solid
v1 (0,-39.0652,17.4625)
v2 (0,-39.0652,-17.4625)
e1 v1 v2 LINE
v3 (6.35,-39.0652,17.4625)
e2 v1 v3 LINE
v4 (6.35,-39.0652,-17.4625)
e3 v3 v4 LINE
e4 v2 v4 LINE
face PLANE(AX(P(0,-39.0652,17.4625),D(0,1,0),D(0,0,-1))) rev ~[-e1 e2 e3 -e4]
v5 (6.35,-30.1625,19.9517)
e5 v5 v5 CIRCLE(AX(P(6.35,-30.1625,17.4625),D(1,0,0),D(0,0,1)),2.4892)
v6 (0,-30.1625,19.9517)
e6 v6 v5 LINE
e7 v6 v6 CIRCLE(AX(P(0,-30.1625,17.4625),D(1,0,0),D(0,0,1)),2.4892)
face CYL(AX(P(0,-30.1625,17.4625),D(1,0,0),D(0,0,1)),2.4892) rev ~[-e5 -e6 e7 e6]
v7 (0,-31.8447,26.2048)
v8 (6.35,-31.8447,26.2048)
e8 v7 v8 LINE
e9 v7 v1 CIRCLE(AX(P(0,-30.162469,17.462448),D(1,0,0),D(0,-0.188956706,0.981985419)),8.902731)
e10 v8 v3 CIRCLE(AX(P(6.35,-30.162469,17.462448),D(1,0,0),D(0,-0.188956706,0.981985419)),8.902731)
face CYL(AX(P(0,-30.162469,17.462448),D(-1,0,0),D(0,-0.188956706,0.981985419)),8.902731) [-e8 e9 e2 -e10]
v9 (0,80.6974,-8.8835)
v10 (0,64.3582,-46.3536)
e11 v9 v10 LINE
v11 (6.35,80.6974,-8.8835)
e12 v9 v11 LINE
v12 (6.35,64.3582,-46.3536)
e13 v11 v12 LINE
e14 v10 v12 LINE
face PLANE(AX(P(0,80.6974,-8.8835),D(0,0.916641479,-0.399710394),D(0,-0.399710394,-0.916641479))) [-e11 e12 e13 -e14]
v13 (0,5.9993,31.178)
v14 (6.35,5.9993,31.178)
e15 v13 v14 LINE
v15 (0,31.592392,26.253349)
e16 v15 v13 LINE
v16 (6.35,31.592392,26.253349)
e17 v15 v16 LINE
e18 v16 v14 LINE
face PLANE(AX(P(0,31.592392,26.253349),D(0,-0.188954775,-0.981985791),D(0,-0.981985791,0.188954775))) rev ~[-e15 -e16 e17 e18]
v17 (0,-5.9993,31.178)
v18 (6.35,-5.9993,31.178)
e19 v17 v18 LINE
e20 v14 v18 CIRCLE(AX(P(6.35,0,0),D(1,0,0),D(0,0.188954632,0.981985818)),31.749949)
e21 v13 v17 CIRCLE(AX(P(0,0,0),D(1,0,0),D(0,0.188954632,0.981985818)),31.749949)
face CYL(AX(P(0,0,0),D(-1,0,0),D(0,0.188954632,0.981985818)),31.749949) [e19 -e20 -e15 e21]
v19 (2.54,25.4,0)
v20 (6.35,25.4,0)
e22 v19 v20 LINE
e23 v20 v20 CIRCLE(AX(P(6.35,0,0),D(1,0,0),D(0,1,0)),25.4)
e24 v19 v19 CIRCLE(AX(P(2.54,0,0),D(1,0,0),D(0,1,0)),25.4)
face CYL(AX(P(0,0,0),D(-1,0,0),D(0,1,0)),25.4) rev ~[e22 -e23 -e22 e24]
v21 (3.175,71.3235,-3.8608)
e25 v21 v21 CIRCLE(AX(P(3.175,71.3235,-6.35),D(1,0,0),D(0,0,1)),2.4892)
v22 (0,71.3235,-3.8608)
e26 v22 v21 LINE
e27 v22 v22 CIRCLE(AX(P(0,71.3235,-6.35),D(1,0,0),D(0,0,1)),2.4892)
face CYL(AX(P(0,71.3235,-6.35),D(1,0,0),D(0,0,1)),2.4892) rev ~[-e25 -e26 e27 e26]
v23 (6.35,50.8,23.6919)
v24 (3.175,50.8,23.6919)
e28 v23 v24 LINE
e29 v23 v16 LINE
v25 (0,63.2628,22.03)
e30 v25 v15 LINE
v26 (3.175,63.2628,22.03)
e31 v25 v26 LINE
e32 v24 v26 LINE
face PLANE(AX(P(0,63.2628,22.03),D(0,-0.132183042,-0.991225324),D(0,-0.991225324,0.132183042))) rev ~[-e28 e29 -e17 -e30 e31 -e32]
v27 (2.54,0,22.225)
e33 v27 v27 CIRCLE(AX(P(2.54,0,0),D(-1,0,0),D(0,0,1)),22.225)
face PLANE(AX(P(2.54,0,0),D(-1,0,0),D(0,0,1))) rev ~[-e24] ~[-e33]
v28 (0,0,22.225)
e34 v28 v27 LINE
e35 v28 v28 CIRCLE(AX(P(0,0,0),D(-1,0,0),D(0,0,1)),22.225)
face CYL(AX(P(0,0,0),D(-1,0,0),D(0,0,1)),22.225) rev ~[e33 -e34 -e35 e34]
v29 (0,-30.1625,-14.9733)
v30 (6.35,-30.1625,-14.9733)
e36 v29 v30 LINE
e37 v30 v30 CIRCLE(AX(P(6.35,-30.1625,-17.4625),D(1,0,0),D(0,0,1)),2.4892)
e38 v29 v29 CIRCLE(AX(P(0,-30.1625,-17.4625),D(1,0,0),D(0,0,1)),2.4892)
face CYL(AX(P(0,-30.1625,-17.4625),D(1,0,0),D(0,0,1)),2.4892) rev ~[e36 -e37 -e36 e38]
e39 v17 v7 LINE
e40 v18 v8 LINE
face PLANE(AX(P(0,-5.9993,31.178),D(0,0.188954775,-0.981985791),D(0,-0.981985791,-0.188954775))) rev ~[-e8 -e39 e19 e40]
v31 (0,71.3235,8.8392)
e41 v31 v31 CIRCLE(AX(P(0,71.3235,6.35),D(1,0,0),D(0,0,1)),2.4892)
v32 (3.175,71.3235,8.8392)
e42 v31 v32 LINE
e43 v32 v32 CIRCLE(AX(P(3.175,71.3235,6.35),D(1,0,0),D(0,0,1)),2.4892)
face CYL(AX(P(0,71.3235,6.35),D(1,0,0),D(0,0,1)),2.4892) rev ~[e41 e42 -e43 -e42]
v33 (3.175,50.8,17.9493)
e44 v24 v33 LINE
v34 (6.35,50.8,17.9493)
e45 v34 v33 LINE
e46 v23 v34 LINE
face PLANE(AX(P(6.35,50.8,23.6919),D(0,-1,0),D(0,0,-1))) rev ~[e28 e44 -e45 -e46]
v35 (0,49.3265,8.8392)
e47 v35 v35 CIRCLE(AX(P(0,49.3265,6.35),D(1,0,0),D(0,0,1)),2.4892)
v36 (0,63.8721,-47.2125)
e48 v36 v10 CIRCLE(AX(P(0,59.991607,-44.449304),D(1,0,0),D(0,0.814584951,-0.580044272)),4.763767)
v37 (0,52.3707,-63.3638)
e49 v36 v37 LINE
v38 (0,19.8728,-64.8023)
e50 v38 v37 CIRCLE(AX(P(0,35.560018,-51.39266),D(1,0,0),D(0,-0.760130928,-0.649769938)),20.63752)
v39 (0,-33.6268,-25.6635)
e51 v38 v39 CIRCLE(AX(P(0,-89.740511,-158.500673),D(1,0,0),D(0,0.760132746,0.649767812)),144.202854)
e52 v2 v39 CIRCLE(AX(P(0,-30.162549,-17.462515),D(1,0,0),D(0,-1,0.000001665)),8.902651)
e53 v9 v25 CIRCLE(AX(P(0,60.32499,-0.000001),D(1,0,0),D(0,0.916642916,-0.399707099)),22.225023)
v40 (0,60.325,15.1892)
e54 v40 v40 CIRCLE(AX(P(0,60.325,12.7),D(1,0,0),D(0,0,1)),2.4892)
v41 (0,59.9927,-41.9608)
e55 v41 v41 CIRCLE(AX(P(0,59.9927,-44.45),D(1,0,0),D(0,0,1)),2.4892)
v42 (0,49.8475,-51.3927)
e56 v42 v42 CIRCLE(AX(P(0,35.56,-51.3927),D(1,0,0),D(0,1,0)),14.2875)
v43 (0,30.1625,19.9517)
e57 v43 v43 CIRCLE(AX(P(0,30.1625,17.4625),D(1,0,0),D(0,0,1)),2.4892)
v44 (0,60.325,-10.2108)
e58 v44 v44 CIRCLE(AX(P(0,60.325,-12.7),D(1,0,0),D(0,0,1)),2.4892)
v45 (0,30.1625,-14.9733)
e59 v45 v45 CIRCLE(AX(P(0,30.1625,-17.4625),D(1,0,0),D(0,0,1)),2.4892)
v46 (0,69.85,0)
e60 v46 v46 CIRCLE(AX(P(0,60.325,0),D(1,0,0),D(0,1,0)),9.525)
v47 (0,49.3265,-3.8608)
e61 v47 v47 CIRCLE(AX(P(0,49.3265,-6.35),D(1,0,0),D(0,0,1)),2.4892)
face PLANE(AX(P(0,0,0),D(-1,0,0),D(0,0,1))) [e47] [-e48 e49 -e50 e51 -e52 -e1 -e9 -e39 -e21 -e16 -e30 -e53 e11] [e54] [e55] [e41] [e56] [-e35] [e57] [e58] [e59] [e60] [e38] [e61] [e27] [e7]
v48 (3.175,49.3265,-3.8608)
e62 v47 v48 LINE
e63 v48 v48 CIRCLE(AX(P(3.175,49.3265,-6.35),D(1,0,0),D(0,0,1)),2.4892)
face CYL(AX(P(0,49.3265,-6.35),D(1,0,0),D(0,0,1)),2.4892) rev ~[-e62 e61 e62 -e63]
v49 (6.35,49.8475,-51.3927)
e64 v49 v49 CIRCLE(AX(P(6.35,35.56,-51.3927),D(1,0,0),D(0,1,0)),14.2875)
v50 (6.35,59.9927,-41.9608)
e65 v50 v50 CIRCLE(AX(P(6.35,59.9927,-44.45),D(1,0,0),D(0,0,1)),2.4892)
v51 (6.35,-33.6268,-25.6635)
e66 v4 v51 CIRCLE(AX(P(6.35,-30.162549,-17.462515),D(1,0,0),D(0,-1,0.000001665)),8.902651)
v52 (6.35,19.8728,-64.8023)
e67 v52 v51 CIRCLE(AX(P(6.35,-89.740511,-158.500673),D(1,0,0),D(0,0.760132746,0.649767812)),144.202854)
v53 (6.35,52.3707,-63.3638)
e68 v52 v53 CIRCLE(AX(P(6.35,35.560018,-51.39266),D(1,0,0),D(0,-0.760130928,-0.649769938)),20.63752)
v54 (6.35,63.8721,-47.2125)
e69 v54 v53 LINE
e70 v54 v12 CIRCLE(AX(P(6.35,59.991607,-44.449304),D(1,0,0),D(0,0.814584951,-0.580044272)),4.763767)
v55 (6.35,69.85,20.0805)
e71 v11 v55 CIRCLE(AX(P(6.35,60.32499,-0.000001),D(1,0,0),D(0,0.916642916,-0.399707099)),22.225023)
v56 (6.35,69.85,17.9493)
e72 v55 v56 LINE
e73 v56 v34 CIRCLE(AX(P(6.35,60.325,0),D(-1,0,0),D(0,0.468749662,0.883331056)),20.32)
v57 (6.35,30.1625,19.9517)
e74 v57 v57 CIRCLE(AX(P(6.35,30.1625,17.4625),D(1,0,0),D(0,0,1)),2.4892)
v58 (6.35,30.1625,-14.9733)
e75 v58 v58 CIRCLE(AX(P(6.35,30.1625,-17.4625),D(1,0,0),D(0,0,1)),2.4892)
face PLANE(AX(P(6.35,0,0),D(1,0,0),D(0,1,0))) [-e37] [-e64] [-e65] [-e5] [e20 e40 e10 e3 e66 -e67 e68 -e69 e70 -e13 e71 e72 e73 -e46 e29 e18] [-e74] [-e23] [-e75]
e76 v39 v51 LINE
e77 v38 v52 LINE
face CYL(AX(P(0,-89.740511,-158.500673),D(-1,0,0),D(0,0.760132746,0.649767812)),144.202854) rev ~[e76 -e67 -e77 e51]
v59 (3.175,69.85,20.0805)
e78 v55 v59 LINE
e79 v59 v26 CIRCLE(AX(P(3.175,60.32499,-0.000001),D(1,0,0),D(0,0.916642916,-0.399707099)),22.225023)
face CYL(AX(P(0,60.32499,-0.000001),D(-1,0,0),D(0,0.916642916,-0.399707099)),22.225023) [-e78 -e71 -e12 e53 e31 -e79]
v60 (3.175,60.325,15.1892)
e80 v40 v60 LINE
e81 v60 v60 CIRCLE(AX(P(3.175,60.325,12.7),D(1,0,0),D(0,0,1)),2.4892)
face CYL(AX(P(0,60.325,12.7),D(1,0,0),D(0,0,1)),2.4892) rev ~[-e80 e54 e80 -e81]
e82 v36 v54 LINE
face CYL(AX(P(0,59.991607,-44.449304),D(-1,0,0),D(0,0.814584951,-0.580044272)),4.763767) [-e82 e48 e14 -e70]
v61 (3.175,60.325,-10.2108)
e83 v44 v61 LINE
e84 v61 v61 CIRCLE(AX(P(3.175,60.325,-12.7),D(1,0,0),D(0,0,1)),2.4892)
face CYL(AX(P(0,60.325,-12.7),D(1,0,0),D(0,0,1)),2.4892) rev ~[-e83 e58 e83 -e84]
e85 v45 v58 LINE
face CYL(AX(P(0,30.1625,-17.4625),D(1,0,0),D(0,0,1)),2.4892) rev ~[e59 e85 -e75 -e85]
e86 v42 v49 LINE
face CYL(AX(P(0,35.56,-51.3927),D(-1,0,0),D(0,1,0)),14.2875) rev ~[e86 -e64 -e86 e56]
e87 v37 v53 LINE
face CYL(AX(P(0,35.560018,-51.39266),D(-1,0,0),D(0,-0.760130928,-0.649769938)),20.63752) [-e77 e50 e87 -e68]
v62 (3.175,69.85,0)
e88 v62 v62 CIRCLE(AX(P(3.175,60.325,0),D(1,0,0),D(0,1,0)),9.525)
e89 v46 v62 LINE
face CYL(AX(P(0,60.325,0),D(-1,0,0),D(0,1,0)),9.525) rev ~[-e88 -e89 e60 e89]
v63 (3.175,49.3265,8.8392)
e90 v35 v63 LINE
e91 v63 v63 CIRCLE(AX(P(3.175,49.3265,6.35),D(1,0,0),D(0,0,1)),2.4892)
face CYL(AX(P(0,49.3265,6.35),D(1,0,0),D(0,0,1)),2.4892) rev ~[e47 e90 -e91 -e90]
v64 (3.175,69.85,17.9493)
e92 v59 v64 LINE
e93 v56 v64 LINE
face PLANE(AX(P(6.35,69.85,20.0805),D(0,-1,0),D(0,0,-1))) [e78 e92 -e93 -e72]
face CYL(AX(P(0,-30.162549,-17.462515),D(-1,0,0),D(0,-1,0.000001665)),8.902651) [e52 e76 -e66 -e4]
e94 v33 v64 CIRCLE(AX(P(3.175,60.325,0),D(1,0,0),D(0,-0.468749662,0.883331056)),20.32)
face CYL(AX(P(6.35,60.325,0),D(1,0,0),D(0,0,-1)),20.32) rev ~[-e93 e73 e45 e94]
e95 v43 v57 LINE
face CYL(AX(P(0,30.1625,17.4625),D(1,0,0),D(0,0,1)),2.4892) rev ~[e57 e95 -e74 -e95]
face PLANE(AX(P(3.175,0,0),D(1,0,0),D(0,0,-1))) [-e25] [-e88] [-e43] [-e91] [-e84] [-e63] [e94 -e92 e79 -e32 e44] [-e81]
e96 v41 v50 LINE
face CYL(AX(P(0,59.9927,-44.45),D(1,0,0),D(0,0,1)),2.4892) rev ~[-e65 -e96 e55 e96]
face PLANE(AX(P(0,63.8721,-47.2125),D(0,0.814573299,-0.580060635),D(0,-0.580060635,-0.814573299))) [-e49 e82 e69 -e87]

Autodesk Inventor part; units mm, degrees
ref_plane "YZ Plane" through (0, 0, 0) normal (1, 0, 0) x (0, 1, 0)
ref_plane "XZ Plane" through (0, 0, 0) normal (0, 1, 0) x (-1, 0, 0)
ref_plane "XY Plane" through (0, 0, 0) normal (0, 0, 1) x (1, 0, 0)
sketch "Sketch1" plane through (0, 0, 0) normal (1, 0, 0) x (0, 1, 0)
  circle A0 centre (0, 0) radius 38.1 construction
  line L0 (27.94, -25.903) -> (27.94, -76.2) construction
  line L1 (27.94, -76.2) -> (-27.94, -76.2) construction
  line L2 (-27.94, -76.2) -> (-27.94, -25.903) construction
  line L3 (-30.1625, -17.4625) -> (30.1625, -17.4625) construction
  line L4 (30.1625, -17.4625) -> (30.1625, 17.4625) construction
  line L5 (30.1625, 17.4625) -> (-30.1625, 17.4625) construction
  line L6 (-30.1625, 17.4625) -> (-30.1625, -17.4625) construction
  line L7 (-30.1625, -17.4625) -> (30.1625, 17.4625) construction
  line L8 (30.1625, -17.4625) -> (-30.1625, 17.4625) construction
  circle A1 centre (30.1625, 17.4625) radius 2.5527 construction
  circle A2 centre (30.1625, -17.4625) radius 2.5527 construction
  circle A3 centre (-30.1625, -17.4625) radius 2.5527 construction
  circle A4 centre (-30.1625, 17.4625) radius 2.5527 construction
  point P0 (0, -76.2)
  dimension "d0" = 76.2
  dimension "d1" = 55.88
  dimension "d2" = 76.2
  dimension "d3" = 60.325
  dimension "d4" = 34.925
  dimension "d5" = 5.1054
  dimension "d6" = 5.1054
  dimension "d7" = 5.1054
  dimension "d8" = 5.1054
sketch "Sketch2" plane through (0, 0, 0) normal (1, 0, 0) x (0, 1, 0)
  line L0 (-30.1625, -17.4625) -> (30.1625, -17.4625) construction
  circle A0 centre (30.1625, -17.4625) radius 2.5527 construction
  circle A1 centre (-30.1625, -17.4625) radius 2.5527 construction
  line L1 (-30.1625, 17.4625) -> (-30.1625, -17.4625) construction
  circle A2 centre (-30.1625, 17.4625) radius 2.5527 construction
  line L2 (30.1625, -17.4625) -> (30.1625, 17.4625) construction
  line L3 (30.1625, -17.4625) -> (-30.1625, 17.4625) construction
  line L4 (30.1625, 17.4625) -> (-30.1625, 17.4625) construction
  line L5 (-30.1625, -17.4625) -> (30.1625, 17.4625) construction
  circle A3 centre (30.1625, 17.4625) radius 2.5527 construction
  circle A4 centre (0, 0) radius 38.1 construction
  line L6 (27.94, -25.903) -> (27.94, -76.2) construction
  line L7 (27.94, -76.2) -> (-27.94, -76.2) construction
  line L8 (-27.94, -76.2) -> (-27.94, -25.903) construction
  circle A5 centre (60.325, 0) radius 12.7 construction
  circle A6 centre (35.56, -51.3927) radius 14.2875
  circle A7 centre (35.56, -51.3927) radius 25.4 construction
  circle A8 centre (60.325, 0) radius 9.525
  circle A9 centre (60.325, 0) radius 22.225 construction
  circle A10 centre (30.1625, 17.4625) radius 8.9027 construction
  circle A11 centre (30.1625, -17.4625) radius 8.9027 construction
  circle A12 centre (-30.1625, -17.4625) radius 8.9027 construction
  circle A13 centre (-30.1625, 17.4625) radius 8.9027 construction
  line L9 (63.2628, 22.03) -> (31.3393, 26.2871)
  line L10 (-39.0652, 17.4625) -> (-39.0652, -17.4625)
  arc A14 (80.6974, -8.8835) -> (63.2628, 22.03) centre (60.325, 0) ccw
  arc A15 (31.3393, 26.2871) -> (31.8447, 26.2048) centre (30.1625, 17.4625) ccw
  arc A16 (-31.8447, 26.2048) -> (-39.0652, 17.4625) centre (-30.1625, 17.4625) ccw
  arc A17 (-39.0652, -17.4625) -> (-33.6268, -25.6635) centre (-30.1625, -17.4625) ccw
  circle A18 centre (35.56, -51.3927) radius 25.4 construction
  circle A19 centre (17.331, -33.7048) radius 4.7625 construction
  circle A20 centre (32.8295, -73.6177) radius 4.8895 construction
  circle A21 centre (59.9927, -44.45) radius 4.7625 construction
  circle A22 centre (0, 0) radius 25.4
  circle A23 centre (0, 0) radius 31.75 construction
  line L11 (31.8447, 26.2048) -> (5.9993, 31.178)
  line L12 (-5.9993, 31.178) -> (-31.8447, 26.2048)
  arc A24 (5.9993, 31.178) -> (-5.9993, 31.178) centre (0, 0) ccw
  circle A25 centre (35.56, -51.3927) radius 29.9974 construction
  circle A26 centre (35.56, -51.3927) radius 20.6375 construction
  circle A27 centre (35.56, -51.3927) radius 7.62 construction
  line L13 (80.6974, -8.8835) -> (64.3582, -46.3536)
  line L14 (63.8721, -47.2125) -> (52.3707, -63.3638)
  arc A28 (63.8721, -47.2125) -> (64.3582, -46.3536) centre (59.9927, -44.45) ccw
  arc A29 (19.8728, -64.8023) -> (-33.6268, -25.6635) centre (-89.741, -158.5012) ccw
  arc A30 (19.8728, -64.8023) -> (52.3707, -63.3638) centre (35.56, -51.3927) ccw
  point P0 (0, -76.2)
  point P1 (71.3235, -6.35)
  point P2 (71.3235, 6.35)
  point P3 (60.325, 12.7)
  point P4 (49.3265, 6.35)
  point P5 (49.3265, -6.35)
  point P6 (60.325, -12.7)
  point P7 (29.3562, -76.0235)
  point P8 (31.5932, 26.2532)
  dimension "d9" = 25.4
  dimension "d76" = 50.8
  dimension "d14" = 360
  dimension "d16" = 28.575
  dimension "d17" = 57.0484
  dimension "d19" = 50.8
  dimension "d20" = 19.05
  dimension "d23" = 6.35
  dimension "d43" = 360
  dimension "d45" = 9.525
  dimension "d46" = 9.779
  dimension "d47" = 9.525
  dimension "d56" = 50.8
  dimension "d57" = 6.35
  dimension "d58" = 44.45
  dimension "d60" = 76.2
  dimension "d65" = 59.9948
  dimension "d66" = 6.35
  dimension "d75" = 15.24
  dimension "d77" = 22.225
  dimension "d78" = 44.45
extrude "Extrusion1" add sketch "Sketch2" along normal blind 6.35 contours L11 A15 L9 | A14 L13 A28 L14 A30 A29 A17 L10 A16 L12 A24 L11 L9
hole "Motor Mount Holes" at (0, -30.1625, -17.4625) at (0, 30.1625, -17.4625) at (0, -30.1625, 17.4625) at (0, 30.1625, 17.4625) at (0, 0, -76.2) at (0, 71.3235, -6.35) at (0, 71.3235, 6.35) at (0, 60.325, 12.7) at (0, 49.3265, 6.35) at (0, 49.3265, -6.35) at (0, 60.325, -12.7) direction (1, 0, 0) diameter 4.9784 end through all clearance for "Flat Head Machine Screw (82)" size "#10" standard "Ansi Unified Screw Threads"
hole "Hole3" at (0, 59.9927, -44.45) direction (1, 0, 0) diameter 4.9784 end through all clearance for "Flat Head Machine Screw (82)" size "#10" standard "Ansi Unified Screw Threads"
sketch "Sketch3" plane through (6.35, 0, 0) normal (1, 0, 0) x (0, 0, -1)
  circle A0 centre (0, 60.325) radius 9.525 projected
  circle A1 centre (0, 60.325) radius 20.32
  point P0 (0, 0)
  dimension "d61" = 40.64
extrude "Extrusion2" cut sketch "Sketch3" against normal blind 3.175
sketch "Sketch4" plane through (6.35, 0, 0) normal (1, 0, 0) x (0, 0, -1)
  circle A0 centre (0, 60.325) radius 20.32 projected
  circle A1 centre (44.45, 59.9927) radius 2.4892 projected
  circle A2 centre (-17.4625, 30.1625) radius 2.4892 projected
  circle A3 centre (17.4625, 30.1625) radius 2.4892 projected
  circle A4 centre (17.4625, -30.1625) radius 2.4892 projected
  circle A5 centre (-17.4625, -30.1625) radius 2.4892 projected
  circle A6 centre (51.3927, 35.56) radius 14.2875 projected
  circle A7 centre (0, 0) radius 25.4 projected
  line L0 (17.4625, -39.0652) -> (-17.4625, -39.0652) projected
  arc A8 (-26.2048, -31.8447) -> (-17.4625, -39.0652) centre (-17.4625, -30.1625) ccw projected
  line L1 (-26.2048, -31.8447) -> (-31.178, -5.9993) projected
  arc A9 (-31.178, 5.9993) -> (-31.178, -5.9993) centre (0, 0) ccw projected
  line L2 (-31.178, 5.9993) -> (-26.2532, 31.5932) projected
  line L3 (-26.2532, 31.5932) -> (-22.03, 63.2628) projected
  arc A10 (8.8835, 80.6974) -> (-22.03, 63.2628) centre (0, 60.325) ccw projected
  line L4 (-20.0805, 69.85) -> (-17.9493, 69.85)
  circle A11 centre (0, 60.325) radius 20.32 projected
  line L5 (-22.03, 63.2628) -> (-26.2532, 31.5932) projected
  line L6 (-23.6919, 50.8) -> (-17.9493, 50.8)
  arc A12 (8.8835, 80.6974) -> (-22.03, 63.2628) centre (0, 60.325) ccw projected
  line L7 (8.8835, 80.6974) -> (46.3536, 64.3582) projected
  arc A13 (47.2125, 63.8721) -> (46.3536, 64.3582) centre (44.45, 59.9927) ccw projected
  line L8 (47.2125, 63.8721) -> (63.3638, 52.3707) projected
  arc A14 (64.8023, 19.8728) -> (25.6635, -33.6268) centre (158.5012, -89.741) ccw projected
  arc A15 (17.4625, -39.0652) -> (25.6635, -33.6268) centre (17.4625, -30.1625) ccw projected
  arc A16 (64.8023, 19.8728) -> (63.3638, 52.3707) centre (51.3927, 35.56) ccw projected
  point P0 (5.7277, 81.7993)
  point P1 (-20.8206, 50.8)
  point P2 (-19.0149, 69.85)
  dimension "d68" = 19.05
  dimension "d69" = 9.525
extrude "Extrusion3" cut sketch "Sketch4" against normal blind 3.175 contours A0 L6 L3 A10 L4
sketch "Sketch5" plane through (0, 0, 0) normal (-1, 0, 0) x (0, 0, 1)
  circle A0 centre (0, 0) radius 22.225
  circle A1 centre (0, 0) radius 25.4 projected
  dimension "d72" = 44.45
extrude "Extrusion4" add sketch "Sketch5" against normal blind 2.54
properties part number "AR-002" material "Aluminum 6061"
